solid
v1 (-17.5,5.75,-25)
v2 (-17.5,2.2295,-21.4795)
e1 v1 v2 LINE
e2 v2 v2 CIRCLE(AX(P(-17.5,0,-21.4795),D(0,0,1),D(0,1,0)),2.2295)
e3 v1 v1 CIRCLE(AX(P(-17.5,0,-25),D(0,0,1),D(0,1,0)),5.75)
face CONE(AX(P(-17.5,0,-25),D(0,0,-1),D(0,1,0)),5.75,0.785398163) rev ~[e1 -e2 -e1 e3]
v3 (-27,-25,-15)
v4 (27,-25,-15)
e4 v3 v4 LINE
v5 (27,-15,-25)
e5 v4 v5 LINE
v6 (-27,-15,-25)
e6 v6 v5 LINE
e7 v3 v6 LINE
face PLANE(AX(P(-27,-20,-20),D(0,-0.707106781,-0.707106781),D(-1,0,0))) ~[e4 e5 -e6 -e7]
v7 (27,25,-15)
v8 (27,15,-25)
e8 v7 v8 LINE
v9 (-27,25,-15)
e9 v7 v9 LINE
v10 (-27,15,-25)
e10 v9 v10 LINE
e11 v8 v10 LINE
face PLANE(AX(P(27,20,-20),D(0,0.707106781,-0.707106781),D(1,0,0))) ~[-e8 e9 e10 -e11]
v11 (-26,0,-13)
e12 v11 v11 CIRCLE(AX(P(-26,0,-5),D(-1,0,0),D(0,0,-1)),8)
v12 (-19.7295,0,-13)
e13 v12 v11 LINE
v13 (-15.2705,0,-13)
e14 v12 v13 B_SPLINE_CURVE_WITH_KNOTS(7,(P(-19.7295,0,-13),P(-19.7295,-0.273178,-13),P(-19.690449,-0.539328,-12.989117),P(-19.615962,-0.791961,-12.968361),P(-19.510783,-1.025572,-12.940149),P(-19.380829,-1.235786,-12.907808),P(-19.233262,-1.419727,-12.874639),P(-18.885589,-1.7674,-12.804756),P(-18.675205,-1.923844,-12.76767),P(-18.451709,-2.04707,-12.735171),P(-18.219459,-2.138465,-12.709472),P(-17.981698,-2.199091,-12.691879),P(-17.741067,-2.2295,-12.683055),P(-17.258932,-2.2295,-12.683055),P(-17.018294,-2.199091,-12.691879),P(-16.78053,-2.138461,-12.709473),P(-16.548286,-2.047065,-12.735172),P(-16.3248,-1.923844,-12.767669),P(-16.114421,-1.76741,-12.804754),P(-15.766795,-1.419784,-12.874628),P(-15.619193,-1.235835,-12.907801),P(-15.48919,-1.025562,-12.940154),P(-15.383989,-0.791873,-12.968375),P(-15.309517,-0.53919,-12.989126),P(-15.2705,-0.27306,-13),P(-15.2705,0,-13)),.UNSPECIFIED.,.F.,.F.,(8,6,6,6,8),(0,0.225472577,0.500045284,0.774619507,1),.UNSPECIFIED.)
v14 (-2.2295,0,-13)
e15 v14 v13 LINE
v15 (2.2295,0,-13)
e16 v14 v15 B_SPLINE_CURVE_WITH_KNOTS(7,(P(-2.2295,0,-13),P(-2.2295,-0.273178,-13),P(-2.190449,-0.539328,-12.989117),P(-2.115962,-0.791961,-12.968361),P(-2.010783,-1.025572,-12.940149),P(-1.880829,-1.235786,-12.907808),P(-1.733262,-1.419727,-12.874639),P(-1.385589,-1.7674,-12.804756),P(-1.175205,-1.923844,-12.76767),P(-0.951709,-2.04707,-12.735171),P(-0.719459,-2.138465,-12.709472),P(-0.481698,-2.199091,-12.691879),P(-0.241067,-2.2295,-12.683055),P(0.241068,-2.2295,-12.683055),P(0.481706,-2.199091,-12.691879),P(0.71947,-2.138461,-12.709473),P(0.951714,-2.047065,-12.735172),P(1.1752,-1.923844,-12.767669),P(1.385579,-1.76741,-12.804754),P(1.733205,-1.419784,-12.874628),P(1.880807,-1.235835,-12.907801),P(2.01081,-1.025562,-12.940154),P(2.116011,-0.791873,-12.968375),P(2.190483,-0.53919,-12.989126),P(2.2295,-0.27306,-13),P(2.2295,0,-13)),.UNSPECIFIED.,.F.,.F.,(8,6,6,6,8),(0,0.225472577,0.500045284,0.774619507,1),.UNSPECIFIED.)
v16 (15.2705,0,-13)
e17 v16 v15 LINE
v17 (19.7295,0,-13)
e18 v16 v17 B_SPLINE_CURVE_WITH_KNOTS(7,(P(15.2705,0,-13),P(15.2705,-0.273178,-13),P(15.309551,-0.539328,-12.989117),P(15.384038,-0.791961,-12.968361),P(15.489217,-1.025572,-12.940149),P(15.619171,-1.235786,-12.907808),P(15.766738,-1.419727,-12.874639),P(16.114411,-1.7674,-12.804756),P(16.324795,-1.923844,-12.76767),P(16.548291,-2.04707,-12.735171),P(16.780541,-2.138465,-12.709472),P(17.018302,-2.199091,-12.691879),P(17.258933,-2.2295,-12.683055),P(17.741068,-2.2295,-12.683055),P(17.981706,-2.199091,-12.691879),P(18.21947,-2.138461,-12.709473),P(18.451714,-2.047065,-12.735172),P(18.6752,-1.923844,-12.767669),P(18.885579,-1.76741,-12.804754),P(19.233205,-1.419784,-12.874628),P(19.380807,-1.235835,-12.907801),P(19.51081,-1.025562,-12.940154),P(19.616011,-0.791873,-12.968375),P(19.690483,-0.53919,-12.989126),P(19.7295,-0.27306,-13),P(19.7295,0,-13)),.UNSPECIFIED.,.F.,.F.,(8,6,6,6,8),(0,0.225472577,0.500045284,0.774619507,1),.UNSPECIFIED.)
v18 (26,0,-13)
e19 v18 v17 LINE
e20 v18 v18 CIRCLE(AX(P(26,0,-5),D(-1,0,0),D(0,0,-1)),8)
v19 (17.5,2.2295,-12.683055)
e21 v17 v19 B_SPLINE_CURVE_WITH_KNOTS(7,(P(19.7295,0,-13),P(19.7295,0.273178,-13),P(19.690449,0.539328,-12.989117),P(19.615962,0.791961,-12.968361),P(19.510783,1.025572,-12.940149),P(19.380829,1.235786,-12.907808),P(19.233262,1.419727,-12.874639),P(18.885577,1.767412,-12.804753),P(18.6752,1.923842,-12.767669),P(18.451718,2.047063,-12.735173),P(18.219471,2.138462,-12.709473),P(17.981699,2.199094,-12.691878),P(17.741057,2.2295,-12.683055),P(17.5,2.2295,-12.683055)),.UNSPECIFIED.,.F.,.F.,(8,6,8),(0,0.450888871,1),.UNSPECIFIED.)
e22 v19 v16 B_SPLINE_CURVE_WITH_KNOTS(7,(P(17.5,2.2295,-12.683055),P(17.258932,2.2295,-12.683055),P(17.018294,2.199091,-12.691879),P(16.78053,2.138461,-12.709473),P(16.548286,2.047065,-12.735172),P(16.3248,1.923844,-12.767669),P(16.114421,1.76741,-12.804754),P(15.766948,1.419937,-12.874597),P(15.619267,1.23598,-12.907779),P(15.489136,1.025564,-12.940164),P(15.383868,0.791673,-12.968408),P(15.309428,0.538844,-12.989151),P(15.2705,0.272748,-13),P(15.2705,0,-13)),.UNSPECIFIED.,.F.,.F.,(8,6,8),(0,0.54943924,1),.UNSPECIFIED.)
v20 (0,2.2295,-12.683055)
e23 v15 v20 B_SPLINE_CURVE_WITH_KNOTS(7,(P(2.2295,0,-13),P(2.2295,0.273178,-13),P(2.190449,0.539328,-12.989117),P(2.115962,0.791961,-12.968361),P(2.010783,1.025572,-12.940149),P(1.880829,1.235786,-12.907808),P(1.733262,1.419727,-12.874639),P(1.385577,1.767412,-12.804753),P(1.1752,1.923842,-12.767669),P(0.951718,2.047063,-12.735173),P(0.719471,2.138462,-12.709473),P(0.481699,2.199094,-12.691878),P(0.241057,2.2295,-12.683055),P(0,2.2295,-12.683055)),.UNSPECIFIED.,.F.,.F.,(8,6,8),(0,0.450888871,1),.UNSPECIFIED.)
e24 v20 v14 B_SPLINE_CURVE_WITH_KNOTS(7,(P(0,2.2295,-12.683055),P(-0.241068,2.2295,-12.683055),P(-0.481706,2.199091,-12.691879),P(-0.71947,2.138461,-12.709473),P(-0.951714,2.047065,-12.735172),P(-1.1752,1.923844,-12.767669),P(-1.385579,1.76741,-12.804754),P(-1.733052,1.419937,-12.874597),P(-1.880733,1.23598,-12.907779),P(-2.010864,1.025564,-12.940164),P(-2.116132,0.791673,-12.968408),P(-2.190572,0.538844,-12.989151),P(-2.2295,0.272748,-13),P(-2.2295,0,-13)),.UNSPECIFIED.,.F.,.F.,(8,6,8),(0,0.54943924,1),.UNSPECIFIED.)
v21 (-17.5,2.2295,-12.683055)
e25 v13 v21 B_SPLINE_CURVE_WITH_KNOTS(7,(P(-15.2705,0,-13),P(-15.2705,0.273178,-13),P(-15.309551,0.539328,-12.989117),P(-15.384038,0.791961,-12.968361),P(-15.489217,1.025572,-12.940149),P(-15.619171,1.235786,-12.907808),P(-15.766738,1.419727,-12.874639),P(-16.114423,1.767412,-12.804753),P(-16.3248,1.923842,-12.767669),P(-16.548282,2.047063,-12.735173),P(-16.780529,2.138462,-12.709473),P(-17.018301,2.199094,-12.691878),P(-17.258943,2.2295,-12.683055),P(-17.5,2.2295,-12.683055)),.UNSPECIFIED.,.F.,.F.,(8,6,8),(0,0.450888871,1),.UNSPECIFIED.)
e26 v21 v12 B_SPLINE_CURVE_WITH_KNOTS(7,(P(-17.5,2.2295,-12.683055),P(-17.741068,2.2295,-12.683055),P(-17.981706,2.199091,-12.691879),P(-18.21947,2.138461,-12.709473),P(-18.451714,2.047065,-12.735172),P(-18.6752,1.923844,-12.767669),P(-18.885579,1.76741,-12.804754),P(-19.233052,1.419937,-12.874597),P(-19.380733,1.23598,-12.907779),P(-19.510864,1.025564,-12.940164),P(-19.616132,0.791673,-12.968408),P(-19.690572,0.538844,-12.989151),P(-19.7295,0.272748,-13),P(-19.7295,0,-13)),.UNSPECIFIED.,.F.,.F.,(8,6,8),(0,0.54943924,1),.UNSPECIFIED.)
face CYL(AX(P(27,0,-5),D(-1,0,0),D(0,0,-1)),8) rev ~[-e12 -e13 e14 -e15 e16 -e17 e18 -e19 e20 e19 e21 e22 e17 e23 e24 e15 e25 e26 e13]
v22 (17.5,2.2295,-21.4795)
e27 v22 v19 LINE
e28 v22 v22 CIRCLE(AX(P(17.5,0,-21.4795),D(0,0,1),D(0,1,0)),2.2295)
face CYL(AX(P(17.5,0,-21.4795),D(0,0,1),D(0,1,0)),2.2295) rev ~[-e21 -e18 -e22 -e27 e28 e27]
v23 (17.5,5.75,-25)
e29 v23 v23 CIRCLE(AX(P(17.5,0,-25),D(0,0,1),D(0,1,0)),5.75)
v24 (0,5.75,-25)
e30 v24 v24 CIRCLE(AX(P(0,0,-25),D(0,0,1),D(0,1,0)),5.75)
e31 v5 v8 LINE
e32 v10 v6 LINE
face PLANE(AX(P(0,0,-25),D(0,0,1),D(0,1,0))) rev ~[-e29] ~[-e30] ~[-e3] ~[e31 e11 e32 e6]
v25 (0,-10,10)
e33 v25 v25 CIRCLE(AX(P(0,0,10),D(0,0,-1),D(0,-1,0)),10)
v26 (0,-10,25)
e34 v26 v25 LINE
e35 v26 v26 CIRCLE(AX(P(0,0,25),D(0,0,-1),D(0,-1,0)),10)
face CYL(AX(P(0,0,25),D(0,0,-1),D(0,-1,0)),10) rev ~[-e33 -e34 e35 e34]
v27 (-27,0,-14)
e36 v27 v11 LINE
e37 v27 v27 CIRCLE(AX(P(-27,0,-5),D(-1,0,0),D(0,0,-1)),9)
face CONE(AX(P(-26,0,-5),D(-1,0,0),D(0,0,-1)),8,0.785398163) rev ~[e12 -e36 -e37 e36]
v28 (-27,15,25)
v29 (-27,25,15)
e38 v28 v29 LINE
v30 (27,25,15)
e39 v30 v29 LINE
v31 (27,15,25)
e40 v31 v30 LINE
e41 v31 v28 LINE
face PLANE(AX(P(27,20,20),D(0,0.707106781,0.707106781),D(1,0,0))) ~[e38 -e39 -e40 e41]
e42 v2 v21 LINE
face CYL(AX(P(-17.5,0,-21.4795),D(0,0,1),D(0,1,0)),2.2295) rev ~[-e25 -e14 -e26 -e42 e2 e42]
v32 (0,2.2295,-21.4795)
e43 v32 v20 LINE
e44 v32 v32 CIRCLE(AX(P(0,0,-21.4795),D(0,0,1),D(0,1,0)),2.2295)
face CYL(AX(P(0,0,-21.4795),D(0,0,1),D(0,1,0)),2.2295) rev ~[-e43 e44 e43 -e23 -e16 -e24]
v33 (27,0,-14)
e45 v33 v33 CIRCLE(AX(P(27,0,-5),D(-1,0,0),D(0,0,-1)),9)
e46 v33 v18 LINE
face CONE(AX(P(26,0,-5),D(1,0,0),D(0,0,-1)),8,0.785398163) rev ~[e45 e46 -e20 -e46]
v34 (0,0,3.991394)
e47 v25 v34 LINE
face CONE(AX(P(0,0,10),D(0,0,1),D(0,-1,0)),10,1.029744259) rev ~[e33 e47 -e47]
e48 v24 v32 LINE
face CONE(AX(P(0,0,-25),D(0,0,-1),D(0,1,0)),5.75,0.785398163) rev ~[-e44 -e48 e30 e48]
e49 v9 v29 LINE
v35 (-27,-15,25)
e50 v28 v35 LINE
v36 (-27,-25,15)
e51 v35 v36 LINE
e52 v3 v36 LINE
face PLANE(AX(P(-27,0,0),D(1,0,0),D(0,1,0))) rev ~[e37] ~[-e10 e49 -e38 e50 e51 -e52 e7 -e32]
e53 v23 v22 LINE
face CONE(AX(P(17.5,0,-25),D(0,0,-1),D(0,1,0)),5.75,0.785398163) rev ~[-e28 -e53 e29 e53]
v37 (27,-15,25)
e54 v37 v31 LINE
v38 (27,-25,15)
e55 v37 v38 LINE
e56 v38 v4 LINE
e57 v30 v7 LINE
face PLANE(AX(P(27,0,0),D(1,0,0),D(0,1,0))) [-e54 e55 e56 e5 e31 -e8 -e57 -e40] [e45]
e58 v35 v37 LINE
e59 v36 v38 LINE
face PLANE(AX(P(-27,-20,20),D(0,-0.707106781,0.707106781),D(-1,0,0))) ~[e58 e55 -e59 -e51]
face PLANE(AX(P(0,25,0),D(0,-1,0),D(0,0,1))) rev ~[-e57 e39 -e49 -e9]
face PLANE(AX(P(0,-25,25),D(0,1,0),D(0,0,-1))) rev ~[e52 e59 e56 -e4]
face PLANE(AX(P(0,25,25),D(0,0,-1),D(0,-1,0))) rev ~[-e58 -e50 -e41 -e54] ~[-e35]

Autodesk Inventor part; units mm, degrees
ref_plane "YZ Plane" through (0, 0, 0) normal (1, 0, 0) x (0, 1, 0)
ref_plane "XZ Plane" through (0, 0, 0) normal (0, 1, 0) x (-1, 0, 0)
ref_plane "XY Plane" through (0, 0, 0) normal (0, 0, 1) x (1, 0, 0)
sketch "Sketch1" plane through (0, 0, 0) normal (1, 0, 0) x (0, 1, 0)
  line L0 (0, 35) -> (0, -35) projected
  line L1 (-35, 0) -> (35, 0) projected
  line L2 (-25, -25) -> (25, -25)
  line L3 (25, -25) -> (25, 25)
  line L4 (25, 25) -> (-25, 25)
  line L5 (-25, 25) -> (-25, -25)
  line L6 (-25, -25) -> (25, 25) construction
  line L7 (25, -25) -> (-25, 25) construction
  point P0 (0, 0)
  dimension "d1" = 50
  dimension "d2" = 50
extrude "Base" add sketch "Sketch1" along normal mid plane 54
sketch "Sketch2" plane through (27, 0, 0) normal (1, 0, 0) x (0, 0, -1)
  line L0 (-35, 0) -> (35, 0) construction
  line L1 (25, -25) -> (25, 25) construction
  point P0 (0, 0)
  point P1 (5, 0)
  dimension "d5" = 20
hole "Hole_Wheel" at (27, 0, -5) direction (-1, 0, 0) diameter 16 end through all
sketch "Sketch3" plane through (27, 25, -25) normal (0, 0, -1) x (-1, 0, 0)
  line L0 (54, -33) -> (0, -33) construction
  line L1 (54, -17) -> (0, -17) construction
  line L2 (54, 0) -> (0, 0) construction
  line L3 (0, -50) -> (0, 0) construction
  line L4 (0, -50) -> (54, -50) construction
  line L5 (54, 0) -> (54, -50) construction
  line L6 (54, -50) -> (54, 0) projected
  line L7 (54, -25) -> (0, -25) construction
  line L8 (54, -50) -> (0, -50) projected
  line L9 (27, -50) -> (27, 0) construction
  line L10 (54, 0) -> (0, 0) projected
  point P0 (27, -25)
  point P1 (44.5, -25)
  point P2 (9.5, -25)
  point P3 (27, -25)
  dimension "d13" = 35
hole "Hole_Wheel_Fix" at (-17.5, 0, -25) at (17.5, 0, -25) at (0, 0, -25) direction (0, 0, 1) diameter 4.459 end up to surface countersink diameter 11.5 countersink angle 90 thread size "M5x0.5" class "6H" standard "ISO Metric profile"
sketch "Sketch4" plane through (-27, -25, 25) normal (0, 0, 1) x (1, 0, 0)
  line L0 (54, 50) -> (54, 0) construction
  line L1 (0, 0) -> (0, 50) construction
  line L2 (0, 50) -> (54, 50) construction
  line L3 (0, 0) -> (54, 0) construction
  line L4 (54, 0) -> (54, 50) construction
  line L5 (52, 52) -> (0, 0) construction
  line L6 (54, 0) -> (0, 0) construction
  line L7 (52, -2) -> (0, 50) construction
  point P0 (27, 25)
  point P1 (27, 25)
hole "ConnectionPipe" at (0, 0, 25) direction (0, 0, -1) diameter 20 depth 15 tip angle 118
chamfer "Chamfer1" distance 10 angle 45 4 edges at (0, 25, -25) (0, -25, -25) (0, 25, 25) (0, -25, 25)
chamfer "Chamfer2" distance 1 angle 45 2 edges at (-27, 0, 3) (27, 0, 3)
properties part number "10-004-ACTR-FIX" material "Stainless Steel"
